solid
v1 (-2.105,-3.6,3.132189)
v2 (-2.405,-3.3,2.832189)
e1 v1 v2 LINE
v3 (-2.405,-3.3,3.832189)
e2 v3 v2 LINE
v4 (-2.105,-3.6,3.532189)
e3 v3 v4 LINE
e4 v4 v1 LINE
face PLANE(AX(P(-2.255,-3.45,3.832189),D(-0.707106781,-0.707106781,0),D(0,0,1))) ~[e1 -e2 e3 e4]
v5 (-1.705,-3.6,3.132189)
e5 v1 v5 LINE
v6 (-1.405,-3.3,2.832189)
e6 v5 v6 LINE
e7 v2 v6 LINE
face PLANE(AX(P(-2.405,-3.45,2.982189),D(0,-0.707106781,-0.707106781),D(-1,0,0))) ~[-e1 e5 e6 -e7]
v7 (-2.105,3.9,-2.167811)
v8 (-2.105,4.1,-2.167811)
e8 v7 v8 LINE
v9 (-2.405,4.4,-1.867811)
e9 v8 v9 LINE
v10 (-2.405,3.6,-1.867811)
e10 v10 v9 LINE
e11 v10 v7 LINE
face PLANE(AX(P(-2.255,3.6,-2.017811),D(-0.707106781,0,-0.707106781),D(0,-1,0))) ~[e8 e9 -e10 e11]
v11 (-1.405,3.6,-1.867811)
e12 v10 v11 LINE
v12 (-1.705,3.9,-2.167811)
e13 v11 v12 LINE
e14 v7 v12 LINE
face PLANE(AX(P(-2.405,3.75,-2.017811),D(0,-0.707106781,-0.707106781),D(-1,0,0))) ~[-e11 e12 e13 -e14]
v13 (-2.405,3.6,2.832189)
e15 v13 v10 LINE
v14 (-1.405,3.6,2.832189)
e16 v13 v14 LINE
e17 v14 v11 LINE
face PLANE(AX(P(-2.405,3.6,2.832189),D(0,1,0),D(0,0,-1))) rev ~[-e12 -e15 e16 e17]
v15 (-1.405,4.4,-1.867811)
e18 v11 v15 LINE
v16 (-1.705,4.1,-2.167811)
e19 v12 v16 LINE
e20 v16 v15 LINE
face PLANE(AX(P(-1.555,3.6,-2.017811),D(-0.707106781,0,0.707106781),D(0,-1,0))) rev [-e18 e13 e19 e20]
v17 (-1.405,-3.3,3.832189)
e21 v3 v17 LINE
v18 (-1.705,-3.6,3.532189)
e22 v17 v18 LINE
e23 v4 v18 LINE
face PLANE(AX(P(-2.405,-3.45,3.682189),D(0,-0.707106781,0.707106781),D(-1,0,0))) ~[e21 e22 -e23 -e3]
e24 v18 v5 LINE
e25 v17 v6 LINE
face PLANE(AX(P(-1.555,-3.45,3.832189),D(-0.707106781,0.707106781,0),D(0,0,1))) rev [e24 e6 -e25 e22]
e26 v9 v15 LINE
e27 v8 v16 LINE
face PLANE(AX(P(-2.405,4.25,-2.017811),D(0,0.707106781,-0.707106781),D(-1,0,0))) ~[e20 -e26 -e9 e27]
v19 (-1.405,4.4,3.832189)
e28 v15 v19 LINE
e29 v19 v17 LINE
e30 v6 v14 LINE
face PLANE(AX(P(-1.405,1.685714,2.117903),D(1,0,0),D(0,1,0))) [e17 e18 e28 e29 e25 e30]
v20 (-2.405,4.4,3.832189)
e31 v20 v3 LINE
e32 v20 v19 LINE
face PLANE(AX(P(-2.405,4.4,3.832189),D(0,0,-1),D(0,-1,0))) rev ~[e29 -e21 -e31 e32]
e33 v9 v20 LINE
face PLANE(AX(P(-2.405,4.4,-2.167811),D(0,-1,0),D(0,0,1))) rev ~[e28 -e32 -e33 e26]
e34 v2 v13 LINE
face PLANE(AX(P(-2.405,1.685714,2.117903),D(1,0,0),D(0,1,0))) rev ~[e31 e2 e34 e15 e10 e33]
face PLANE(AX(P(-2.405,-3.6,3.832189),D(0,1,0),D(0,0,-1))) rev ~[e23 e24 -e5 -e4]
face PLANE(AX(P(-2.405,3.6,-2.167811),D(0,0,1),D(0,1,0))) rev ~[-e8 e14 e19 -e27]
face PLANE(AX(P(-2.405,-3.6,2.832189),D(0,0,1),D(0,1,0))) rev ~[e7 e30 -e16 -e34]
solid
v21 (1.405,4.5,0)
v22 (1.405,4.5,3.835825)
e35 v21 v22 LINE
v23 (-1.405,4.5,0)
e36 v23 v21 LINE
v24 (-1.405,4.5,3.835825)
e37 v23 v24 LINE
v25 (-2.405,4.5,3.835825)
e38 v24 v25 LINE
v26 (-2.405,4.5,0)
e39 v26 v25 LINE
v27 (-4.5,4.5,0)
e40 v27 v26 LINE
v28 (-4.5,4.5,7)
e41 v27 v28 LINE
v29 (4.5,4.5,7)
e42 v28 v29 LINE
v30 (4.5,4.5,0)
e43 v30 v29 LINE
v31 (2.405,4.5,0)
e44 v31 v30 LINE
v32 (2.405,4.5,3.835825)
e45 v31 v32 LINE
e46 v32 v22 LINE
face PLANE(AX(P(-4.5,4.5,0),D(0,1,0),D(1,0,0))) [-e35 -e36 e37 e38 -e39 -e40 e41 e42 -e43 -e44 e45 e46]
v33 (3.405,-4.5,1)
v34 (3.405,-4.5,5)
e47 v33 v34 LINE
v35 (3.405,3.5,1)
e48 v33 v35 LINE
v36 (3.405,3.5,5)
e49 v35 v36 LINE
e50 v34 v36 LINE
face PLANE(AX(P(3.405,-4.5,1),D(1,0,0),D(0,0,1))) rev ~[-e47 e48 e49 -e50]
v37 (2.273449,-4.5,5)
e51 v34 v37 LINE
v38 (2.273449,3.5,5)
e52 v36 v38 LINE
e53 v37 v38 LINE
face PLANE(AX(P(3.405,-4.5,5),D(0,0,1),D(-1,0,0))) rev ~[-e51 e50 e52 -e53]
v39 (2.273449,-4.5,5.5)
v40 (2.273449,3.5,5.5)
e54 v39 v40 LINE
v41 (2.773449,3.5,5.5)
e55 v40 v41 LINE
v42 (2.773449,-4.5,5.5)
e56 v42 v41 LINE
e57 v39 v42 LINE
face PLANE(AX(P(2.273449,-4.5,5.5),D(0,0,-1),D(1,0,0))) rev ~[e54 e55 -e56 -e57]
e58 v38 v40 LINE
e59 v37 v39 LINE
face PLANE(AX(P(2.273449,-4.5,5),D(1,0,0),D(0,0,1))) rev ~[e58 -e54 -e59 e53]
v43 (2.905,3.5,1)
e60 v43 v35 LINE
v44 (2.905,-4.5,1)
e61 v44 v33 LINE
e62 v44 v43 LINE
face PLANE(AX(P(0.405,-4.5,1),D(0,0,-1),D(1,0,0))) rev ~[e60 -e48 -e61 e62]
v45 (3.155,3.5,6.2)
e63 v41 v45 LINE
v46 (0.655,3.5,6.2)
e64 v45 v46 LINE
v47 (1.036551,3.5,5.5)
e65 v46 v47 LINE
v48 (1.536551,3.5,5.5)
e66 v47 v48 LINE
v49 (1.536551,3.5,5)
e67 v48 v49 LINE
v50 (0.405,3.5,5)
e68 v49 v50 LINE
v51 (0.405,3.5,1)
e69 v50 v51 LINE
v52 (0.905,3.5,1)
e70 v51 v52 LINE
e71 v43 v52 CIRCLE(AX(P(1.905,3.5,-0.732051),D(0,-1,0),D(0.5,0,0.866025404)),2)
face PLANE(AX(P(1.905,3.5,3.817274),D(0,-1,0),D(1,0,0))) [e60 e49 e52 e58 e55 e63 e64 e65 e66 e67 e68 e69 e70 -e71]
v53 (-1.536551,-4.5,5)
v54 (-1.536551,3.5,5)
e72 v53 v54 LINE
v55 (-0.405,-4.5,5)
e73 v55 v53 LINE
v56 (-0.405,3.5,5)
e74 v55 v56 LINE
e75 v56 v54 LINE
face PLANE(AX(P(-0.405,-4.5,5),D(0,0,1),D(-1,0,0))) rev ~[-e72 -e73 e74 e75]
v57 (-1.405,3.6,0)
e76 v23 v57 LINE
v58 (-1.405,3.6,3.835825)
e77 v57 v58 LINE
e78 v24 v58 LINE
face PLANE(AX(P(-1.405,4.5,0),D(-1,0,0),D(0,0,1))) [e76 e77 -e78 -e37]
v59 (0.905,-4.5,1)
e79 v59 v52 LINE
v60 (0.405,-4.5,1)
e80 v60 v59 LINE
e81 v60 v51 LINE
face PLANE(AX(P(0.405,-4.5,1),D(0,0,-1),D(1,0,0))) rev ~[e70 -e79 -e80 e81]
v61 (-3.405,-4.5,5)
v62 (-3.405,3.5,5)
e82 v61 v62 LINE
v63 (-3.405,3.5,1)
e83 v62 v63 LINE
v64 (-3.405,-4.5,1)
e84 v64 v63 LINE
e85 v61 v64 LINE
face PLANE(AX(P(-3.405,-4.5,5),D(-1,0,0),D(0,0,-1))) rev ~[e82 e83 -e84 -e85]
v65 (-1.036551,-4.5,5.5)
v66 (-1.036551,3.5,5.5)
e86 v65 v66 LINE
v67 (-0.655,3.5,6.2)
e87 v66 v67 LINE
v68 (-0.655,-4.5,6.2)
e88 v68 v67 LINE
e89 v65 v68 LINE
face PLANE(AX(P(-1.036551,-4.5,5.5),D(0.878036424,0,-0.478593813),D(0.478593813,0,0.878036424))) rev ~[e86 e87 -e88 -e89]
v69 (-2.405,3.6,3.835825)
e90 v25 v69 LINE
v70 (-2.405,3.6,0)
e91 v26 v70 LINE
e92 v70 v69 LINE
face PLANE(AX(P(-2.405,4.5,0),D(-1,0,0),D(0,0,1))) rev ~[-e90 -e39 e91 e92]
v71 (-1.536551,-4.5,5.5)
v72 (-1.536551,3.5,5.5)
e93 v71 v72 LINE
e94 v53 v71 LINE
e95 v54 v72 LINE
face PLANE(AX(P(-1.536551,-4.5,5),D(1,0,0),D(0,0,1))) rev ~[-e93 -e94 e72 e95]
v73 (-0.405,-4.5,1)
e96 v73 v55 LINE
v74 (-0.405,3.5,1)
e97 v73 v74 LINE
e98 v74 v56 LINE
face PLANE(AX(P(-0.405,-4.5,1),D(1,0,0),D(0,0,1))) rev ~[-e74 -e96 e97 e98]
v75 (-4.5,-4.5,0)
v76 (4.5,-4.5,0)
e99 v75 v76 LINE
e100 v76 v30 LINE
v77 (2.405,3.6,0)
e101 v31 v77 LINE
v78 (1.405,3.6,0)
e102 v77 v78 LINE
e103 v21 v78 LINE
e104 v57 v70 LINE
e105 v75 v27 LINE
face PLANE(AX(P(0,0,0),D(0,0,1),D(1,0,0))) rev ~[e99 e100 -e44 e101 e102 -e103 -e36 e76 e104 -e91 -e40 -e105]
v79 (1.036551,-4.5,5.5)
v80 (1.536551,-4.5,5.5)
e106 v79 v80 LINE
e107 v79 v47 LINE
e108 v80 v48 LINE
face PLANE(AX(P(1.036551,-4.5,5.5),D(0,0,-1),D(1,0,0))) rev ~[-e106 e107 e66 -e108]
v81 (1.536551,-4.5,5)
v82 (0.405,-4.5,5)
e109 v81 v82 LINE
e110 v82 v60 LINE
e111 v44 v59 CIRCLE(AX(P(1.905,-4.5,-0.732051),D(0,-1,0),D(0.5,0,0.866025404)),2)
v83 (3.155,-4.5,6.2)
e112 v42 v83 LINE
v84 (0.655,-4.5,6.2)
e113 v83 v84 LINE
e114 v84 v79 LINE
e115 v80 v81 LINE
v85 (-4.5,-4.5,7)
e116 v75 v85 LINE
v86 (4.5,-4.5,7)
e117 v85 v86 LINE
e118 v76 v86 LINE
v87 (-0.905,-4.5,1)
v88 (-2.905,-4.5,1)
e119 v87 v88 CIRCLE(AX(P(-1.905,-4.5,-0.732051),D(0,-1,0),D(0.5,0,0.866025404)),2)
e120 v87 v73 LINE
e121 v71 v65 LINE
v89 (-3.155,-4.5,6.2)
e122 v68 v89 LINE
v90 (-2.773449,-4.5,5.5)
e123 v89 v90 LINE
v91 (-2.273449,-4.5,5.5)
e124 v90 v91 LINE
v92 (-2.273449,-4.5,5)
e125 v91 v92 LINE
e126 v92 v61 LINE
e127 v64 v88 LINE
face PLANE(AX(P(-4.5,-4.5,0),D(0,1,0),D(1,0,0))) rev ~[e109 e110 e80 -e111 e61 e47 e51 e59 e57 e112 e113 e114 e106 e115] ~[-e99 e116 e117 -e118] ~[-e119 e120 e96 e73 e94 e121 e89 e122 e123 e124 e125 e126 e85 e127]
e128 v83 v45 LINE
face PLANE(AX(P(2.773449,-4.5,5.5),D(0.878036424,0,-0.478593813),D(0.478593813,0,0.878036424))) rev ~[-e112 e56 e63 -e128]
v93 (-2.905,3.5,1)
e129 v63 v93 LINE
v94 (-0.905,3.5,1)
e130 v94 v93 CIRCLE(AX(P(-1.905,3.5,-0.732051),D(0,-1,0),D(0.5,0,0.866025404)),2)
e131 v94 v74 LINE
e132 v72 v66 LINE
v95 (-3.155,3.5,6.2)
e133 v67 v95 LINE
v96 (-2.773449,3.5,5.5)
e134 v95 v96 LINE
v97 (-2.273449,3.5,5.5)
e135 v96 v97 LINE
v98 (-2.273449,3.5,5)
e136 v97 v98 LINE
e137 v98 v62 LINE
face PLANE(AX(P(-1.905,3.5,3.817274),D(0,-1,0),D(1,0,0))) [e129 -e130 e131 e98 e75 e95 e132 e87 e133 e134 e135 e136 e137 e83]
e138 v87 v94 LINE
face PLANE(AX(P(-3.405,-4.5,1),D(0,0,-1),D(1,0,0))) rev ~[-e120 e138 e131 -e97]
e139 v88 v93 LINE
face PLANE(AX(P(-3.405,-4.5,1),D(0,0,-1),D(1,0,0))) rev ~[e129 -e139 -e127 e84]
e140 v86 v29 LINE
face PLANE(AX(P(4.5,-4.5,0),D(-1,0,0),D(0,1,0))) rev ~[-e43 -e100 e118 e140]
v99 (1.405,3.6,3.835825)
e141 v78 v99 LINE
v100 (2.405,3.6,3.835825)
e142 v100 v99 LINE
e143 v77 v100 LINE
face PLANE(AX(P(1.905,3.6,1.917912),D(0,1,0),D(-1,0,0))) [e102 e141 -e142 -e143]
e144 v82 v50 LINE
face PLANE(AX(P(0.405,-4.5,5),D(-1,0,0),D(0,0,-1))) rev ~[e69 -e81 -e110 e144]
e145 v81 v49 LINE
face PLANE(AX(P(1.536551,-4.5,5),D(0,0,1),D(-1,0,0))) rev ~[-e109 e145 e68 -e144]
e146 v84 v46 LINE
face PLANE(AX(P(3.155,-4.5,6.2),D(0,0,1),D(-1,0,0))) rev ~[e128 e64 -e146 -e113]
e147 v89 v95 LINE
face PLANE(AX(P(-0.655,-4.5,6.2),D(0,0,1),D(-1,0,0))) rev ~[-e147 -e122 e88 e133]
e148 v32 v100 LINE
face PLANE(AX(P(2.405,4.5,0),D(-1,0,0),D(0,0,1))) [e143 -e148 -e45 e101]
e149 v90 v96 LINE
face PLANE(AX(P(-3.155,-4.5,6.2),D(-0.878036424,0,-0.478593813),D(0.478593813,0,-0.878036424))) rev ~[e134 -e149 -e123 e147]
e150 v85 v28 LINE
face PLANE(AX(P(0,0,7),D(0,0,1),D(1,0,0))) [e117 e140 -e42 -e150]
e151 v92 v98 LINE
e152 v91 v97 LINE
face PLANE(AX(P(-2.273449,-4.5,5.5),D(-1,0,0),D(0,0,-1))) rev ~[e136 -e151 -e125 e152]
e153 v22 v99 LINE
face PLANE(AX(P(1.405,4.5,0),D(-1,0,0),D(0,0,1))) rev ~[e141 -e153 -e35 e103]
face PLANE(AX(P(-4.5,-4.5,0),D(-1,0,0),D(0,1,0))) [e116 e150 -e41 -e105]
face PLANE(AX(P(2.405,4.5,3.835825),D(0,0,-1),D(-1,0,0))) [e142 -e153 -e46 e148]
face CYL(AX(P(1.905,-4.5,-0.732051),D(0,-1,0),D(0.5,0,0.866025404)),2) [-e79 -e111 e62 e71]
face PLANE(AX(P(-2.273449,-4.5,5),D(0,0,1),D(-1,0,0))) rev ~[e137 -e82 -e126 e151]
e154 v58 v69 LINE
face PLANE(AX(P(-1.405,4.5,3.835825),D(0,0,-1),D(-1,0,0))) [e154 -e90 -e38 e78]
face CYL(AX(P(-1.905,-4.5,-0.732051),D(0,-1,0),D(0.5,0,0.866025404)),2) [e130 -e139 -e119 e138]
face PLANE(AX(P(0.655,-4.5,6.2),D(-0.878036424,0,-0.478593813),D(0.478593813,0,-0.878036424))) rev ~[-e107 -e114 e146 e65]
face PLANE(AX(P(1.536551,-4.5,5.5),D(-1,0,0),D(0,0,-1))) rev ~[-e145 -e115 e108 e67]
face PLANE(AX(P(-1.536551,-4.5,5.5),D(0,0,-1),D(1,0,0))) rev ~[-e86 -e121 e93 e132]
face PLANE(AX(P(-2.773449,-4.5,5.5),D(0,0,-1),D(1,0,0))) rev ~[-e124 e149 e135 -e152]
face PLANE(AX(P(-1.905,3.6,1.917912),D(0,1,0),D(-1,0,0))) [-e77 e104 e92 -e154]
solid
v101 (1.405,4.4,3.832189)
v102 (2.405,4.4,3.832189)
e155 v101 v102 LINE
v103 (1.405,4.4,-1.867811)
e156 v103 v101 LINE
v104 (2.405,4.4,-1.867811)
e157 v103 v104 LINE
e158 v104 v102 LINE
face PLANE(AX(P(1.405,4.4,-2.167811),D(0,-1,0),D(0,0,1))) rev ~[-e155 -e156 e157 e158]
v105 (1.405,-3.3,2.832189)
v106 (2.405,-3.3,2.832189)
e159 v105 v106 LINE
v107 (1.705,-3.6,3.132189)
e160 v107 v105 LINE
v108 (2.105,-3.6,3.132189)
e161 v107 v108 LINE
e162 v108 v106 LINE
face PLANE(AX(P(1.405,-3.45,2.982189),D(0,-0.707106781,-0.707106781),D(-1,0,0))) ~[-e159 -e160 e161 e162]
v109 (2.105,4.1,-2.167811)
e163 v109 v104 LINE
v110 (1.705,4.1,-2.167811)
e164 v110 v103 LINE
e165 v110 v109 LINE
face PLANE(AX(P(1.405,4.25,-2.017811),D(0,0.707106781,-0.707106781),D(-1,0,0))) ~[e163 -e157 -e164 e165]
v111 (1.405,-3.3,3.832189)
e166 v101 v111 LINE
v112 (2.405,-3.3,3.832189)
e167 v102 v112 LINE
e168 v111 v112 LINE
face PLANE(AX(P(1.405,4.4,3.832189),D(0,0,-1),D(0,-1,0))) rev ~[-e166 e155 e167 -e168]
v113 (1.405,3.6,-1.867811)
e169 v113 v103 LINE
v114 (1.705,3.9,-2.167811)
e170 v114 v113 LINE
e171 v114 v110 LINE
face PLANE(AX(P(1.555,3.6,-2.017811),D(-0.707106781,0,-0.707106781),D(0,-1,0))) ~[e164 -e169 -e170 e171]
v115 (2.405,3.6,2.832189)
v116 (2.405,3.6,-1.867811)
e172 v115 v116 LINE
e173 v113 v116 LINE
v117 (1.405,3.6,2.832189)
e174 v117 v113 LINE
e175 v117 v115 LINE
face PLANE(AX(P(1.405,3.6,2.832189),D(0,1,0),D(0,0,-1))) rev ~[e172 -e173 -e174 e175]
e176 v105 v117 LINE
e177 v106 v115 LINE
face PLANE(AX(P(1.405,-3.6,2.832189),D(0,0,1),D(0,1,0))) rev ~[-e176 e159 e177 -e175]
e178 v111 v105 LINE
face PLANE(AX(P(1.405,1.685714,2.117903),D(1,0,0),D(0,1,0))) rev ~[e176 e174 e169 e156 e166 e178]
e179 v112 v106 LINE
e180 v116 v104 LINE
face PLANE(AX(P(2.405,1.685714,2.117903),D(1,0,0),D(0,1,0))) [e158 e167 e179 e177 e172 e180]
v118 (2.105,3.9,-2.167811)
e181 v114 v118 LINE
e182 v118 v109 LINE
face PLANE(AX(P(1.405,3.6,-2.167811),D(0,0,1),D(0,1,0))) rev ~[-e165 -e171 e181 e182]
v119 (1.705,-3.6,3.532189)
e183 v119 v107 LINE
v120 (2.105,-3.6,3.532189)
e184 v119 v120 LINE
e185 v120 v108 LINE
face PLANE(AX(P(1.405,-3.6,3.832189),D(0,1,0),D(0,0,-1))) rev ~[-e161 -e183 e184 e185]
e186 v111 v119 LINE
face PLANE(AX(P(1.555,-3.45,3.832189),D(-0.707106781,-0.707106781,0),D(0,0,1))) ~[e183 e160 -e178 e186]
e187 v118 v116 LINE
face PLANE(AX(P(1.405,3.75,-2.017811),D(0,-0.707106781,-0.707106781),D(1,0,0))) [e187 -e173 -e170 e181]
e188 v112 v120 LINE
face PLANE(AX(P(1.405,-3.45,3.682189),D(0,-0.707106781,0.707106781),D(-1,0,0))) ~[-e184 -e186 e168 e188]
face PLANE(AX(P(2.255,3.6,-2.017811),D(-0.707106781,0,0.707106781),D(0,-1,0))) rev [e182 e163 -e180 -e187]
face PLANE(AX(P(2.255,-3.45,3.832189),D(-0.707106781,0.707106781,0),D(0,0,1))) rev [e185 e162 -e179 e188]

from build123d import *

# Parameters (mm, degrees)
F0_W       = 9
F0_H       = 9
F1_DEPTH   = 7
F3_DEPTH   = 8
F4_W       = 1
F4_H       = 3.8358249348
F5_DEPTH   = 0.9
F8_DEPTH   = 1
F10_DEPTH  = 1
F11_SIZE   = 0.3
F11_2_SIZE = 0.3
F13_DEPTH  = 8


# Not quite as in the source:
# - a feature names something its author has since deleted; it is built from what else it names


with BuildPart() as f1:
    # F0 (on Top) → F1 (new body)
    with BuildSketch(Plane.XY):
        Rectangle(F0_W, F0_H)
    extrude(amount=F1_DEPTH)

    # F2 (on face) → F3 (cut)
    with BuildSketch(Plane.XZ.offset(4.5)):
        Polygon((-3.405, 1), (-0.405, 1), (-0.405, 5), (-1.5365509928, 5), (-1.5365509928, 5.5), (-1.0365509928, 5.5), (-0.655, 6.2), (-3.155, 6.2), (-2.7734490072, 5.5), (-2.2734490072, 5.5), (-2.2734490072, 5), (-3.405, 5), align=None)
        Polygon((3.155, 6.2), (0.655, 6.2), (1.0365509928, 5.5), (1.5365509928, 5.5), (1.5365509928, 5), (0.405, 5), (0.405, 1), (3.405, 1), (3.405, 5), (2.2734490072, 5), (2.2734490072, 5.5), (2.7734490072, 5.5), align=None)
    extrude(amount=-F3_DEPTH, mode=Mode.SUBTRACT)

    # F4 (on face) → F5 (cut)
    with BuildSketch(Plane(origin=(0, 4.5, 0), x_dir=(-1, 0, 0), z_dir=(0, 1, 0))):
        with Locations((-1.905, 1.9179124674)):
            Rectangle(F4_W, F4_H)
        with Locations((1.905, 1.9179124674)):
            Rectangle(F4_W, F4_H)
    extrude(amount=-F5_DEPTH, mode=Mode.SUBTRACT)

    # F12 (on face) → F13 (join, through all)
    with BuildSketch(Plane.XZ.offset(4.5)):
        with BuildLine():
            Line((-2.905, 1), (-0.905, 1))
            ThreePointArc((-0.905, 1), (-1.905, 1.2679491924), (-2.905, 1))
        make_face()
        with BuildLine():
            ThreePointArc((2.905, 1), (1.905, 1.2679491924), (0.905, 1))
            Line((0.905, 1), (2.905, 1))
        make_face()
    extrude(amount=-F13_DEPTH)


with BuildPart() as f8:
    # F7 (on face) → F8 (new body)
    with BuildSketch(Plane.YZ.offset(-2.405)):
        Polygon((4.4, 3.8321887431), (-3.6, 3.8321887431), (-3.6, 2.8321887431), (3.6, 2.8321887431), (3.6, -2.1678112569), (4.4, -2.1678112569), align=None)
    extrude(amount=F8_DEPTH)

    # F11
    f11_edges = [f8.edges().sort_by_distance(p)[0] for p in [
        (-1.905, -3.6, 3.832189),
        (-1.905, -3.6, 2.832189),
        (-2.405, -3.6, 3.332189),
        (-1.405, -3.6, 3.332189),
        (-1.905, 3.6, -2.167811),
        (-1.905, 4.4, -2.167811),
        (-2.405, 4, -2.167811),
        (-1.405, 4, -2.167811),
    ]]
    chamfer(f11_edges, length=F11_SIZE)


with BuildPart() as f10:
    # F9 (on face) → F10 (new body)
    with BuildSketch(Plane.YZ.offset(1.405)):
        Polygon((3.6, -2.1678112569), (4.4, -2.1678112569), (4.4, 3.8321887431), (-3.6, 3.8321887431), (-3.6, 2.8321887431), (3.6, 2.8321887431), align=None)
    extrude(amount=F10_DEPTH)

    # F11#2
    f11_2_edges = [f10.edges().sort_by_distance(p)[0] for p in [
        (1.905, -3.6, 3.832189),
        (1.905, -3.6, 2.832189),
        (1.405, -3.6, 3.332189),
        (2.405, -3.6, 3.332189),
        (1.905, 3.6, -2.167811),
        (1.905, 4.4, -2.167811),
        (1.405, 4, -2.167811),
        (2.405, 4, -2.167811),
    ]]
    chamfer(f11_2_edges, length=F11_2_SIZE)


solid = Compound([f1.part, f8.part, f10.part])
